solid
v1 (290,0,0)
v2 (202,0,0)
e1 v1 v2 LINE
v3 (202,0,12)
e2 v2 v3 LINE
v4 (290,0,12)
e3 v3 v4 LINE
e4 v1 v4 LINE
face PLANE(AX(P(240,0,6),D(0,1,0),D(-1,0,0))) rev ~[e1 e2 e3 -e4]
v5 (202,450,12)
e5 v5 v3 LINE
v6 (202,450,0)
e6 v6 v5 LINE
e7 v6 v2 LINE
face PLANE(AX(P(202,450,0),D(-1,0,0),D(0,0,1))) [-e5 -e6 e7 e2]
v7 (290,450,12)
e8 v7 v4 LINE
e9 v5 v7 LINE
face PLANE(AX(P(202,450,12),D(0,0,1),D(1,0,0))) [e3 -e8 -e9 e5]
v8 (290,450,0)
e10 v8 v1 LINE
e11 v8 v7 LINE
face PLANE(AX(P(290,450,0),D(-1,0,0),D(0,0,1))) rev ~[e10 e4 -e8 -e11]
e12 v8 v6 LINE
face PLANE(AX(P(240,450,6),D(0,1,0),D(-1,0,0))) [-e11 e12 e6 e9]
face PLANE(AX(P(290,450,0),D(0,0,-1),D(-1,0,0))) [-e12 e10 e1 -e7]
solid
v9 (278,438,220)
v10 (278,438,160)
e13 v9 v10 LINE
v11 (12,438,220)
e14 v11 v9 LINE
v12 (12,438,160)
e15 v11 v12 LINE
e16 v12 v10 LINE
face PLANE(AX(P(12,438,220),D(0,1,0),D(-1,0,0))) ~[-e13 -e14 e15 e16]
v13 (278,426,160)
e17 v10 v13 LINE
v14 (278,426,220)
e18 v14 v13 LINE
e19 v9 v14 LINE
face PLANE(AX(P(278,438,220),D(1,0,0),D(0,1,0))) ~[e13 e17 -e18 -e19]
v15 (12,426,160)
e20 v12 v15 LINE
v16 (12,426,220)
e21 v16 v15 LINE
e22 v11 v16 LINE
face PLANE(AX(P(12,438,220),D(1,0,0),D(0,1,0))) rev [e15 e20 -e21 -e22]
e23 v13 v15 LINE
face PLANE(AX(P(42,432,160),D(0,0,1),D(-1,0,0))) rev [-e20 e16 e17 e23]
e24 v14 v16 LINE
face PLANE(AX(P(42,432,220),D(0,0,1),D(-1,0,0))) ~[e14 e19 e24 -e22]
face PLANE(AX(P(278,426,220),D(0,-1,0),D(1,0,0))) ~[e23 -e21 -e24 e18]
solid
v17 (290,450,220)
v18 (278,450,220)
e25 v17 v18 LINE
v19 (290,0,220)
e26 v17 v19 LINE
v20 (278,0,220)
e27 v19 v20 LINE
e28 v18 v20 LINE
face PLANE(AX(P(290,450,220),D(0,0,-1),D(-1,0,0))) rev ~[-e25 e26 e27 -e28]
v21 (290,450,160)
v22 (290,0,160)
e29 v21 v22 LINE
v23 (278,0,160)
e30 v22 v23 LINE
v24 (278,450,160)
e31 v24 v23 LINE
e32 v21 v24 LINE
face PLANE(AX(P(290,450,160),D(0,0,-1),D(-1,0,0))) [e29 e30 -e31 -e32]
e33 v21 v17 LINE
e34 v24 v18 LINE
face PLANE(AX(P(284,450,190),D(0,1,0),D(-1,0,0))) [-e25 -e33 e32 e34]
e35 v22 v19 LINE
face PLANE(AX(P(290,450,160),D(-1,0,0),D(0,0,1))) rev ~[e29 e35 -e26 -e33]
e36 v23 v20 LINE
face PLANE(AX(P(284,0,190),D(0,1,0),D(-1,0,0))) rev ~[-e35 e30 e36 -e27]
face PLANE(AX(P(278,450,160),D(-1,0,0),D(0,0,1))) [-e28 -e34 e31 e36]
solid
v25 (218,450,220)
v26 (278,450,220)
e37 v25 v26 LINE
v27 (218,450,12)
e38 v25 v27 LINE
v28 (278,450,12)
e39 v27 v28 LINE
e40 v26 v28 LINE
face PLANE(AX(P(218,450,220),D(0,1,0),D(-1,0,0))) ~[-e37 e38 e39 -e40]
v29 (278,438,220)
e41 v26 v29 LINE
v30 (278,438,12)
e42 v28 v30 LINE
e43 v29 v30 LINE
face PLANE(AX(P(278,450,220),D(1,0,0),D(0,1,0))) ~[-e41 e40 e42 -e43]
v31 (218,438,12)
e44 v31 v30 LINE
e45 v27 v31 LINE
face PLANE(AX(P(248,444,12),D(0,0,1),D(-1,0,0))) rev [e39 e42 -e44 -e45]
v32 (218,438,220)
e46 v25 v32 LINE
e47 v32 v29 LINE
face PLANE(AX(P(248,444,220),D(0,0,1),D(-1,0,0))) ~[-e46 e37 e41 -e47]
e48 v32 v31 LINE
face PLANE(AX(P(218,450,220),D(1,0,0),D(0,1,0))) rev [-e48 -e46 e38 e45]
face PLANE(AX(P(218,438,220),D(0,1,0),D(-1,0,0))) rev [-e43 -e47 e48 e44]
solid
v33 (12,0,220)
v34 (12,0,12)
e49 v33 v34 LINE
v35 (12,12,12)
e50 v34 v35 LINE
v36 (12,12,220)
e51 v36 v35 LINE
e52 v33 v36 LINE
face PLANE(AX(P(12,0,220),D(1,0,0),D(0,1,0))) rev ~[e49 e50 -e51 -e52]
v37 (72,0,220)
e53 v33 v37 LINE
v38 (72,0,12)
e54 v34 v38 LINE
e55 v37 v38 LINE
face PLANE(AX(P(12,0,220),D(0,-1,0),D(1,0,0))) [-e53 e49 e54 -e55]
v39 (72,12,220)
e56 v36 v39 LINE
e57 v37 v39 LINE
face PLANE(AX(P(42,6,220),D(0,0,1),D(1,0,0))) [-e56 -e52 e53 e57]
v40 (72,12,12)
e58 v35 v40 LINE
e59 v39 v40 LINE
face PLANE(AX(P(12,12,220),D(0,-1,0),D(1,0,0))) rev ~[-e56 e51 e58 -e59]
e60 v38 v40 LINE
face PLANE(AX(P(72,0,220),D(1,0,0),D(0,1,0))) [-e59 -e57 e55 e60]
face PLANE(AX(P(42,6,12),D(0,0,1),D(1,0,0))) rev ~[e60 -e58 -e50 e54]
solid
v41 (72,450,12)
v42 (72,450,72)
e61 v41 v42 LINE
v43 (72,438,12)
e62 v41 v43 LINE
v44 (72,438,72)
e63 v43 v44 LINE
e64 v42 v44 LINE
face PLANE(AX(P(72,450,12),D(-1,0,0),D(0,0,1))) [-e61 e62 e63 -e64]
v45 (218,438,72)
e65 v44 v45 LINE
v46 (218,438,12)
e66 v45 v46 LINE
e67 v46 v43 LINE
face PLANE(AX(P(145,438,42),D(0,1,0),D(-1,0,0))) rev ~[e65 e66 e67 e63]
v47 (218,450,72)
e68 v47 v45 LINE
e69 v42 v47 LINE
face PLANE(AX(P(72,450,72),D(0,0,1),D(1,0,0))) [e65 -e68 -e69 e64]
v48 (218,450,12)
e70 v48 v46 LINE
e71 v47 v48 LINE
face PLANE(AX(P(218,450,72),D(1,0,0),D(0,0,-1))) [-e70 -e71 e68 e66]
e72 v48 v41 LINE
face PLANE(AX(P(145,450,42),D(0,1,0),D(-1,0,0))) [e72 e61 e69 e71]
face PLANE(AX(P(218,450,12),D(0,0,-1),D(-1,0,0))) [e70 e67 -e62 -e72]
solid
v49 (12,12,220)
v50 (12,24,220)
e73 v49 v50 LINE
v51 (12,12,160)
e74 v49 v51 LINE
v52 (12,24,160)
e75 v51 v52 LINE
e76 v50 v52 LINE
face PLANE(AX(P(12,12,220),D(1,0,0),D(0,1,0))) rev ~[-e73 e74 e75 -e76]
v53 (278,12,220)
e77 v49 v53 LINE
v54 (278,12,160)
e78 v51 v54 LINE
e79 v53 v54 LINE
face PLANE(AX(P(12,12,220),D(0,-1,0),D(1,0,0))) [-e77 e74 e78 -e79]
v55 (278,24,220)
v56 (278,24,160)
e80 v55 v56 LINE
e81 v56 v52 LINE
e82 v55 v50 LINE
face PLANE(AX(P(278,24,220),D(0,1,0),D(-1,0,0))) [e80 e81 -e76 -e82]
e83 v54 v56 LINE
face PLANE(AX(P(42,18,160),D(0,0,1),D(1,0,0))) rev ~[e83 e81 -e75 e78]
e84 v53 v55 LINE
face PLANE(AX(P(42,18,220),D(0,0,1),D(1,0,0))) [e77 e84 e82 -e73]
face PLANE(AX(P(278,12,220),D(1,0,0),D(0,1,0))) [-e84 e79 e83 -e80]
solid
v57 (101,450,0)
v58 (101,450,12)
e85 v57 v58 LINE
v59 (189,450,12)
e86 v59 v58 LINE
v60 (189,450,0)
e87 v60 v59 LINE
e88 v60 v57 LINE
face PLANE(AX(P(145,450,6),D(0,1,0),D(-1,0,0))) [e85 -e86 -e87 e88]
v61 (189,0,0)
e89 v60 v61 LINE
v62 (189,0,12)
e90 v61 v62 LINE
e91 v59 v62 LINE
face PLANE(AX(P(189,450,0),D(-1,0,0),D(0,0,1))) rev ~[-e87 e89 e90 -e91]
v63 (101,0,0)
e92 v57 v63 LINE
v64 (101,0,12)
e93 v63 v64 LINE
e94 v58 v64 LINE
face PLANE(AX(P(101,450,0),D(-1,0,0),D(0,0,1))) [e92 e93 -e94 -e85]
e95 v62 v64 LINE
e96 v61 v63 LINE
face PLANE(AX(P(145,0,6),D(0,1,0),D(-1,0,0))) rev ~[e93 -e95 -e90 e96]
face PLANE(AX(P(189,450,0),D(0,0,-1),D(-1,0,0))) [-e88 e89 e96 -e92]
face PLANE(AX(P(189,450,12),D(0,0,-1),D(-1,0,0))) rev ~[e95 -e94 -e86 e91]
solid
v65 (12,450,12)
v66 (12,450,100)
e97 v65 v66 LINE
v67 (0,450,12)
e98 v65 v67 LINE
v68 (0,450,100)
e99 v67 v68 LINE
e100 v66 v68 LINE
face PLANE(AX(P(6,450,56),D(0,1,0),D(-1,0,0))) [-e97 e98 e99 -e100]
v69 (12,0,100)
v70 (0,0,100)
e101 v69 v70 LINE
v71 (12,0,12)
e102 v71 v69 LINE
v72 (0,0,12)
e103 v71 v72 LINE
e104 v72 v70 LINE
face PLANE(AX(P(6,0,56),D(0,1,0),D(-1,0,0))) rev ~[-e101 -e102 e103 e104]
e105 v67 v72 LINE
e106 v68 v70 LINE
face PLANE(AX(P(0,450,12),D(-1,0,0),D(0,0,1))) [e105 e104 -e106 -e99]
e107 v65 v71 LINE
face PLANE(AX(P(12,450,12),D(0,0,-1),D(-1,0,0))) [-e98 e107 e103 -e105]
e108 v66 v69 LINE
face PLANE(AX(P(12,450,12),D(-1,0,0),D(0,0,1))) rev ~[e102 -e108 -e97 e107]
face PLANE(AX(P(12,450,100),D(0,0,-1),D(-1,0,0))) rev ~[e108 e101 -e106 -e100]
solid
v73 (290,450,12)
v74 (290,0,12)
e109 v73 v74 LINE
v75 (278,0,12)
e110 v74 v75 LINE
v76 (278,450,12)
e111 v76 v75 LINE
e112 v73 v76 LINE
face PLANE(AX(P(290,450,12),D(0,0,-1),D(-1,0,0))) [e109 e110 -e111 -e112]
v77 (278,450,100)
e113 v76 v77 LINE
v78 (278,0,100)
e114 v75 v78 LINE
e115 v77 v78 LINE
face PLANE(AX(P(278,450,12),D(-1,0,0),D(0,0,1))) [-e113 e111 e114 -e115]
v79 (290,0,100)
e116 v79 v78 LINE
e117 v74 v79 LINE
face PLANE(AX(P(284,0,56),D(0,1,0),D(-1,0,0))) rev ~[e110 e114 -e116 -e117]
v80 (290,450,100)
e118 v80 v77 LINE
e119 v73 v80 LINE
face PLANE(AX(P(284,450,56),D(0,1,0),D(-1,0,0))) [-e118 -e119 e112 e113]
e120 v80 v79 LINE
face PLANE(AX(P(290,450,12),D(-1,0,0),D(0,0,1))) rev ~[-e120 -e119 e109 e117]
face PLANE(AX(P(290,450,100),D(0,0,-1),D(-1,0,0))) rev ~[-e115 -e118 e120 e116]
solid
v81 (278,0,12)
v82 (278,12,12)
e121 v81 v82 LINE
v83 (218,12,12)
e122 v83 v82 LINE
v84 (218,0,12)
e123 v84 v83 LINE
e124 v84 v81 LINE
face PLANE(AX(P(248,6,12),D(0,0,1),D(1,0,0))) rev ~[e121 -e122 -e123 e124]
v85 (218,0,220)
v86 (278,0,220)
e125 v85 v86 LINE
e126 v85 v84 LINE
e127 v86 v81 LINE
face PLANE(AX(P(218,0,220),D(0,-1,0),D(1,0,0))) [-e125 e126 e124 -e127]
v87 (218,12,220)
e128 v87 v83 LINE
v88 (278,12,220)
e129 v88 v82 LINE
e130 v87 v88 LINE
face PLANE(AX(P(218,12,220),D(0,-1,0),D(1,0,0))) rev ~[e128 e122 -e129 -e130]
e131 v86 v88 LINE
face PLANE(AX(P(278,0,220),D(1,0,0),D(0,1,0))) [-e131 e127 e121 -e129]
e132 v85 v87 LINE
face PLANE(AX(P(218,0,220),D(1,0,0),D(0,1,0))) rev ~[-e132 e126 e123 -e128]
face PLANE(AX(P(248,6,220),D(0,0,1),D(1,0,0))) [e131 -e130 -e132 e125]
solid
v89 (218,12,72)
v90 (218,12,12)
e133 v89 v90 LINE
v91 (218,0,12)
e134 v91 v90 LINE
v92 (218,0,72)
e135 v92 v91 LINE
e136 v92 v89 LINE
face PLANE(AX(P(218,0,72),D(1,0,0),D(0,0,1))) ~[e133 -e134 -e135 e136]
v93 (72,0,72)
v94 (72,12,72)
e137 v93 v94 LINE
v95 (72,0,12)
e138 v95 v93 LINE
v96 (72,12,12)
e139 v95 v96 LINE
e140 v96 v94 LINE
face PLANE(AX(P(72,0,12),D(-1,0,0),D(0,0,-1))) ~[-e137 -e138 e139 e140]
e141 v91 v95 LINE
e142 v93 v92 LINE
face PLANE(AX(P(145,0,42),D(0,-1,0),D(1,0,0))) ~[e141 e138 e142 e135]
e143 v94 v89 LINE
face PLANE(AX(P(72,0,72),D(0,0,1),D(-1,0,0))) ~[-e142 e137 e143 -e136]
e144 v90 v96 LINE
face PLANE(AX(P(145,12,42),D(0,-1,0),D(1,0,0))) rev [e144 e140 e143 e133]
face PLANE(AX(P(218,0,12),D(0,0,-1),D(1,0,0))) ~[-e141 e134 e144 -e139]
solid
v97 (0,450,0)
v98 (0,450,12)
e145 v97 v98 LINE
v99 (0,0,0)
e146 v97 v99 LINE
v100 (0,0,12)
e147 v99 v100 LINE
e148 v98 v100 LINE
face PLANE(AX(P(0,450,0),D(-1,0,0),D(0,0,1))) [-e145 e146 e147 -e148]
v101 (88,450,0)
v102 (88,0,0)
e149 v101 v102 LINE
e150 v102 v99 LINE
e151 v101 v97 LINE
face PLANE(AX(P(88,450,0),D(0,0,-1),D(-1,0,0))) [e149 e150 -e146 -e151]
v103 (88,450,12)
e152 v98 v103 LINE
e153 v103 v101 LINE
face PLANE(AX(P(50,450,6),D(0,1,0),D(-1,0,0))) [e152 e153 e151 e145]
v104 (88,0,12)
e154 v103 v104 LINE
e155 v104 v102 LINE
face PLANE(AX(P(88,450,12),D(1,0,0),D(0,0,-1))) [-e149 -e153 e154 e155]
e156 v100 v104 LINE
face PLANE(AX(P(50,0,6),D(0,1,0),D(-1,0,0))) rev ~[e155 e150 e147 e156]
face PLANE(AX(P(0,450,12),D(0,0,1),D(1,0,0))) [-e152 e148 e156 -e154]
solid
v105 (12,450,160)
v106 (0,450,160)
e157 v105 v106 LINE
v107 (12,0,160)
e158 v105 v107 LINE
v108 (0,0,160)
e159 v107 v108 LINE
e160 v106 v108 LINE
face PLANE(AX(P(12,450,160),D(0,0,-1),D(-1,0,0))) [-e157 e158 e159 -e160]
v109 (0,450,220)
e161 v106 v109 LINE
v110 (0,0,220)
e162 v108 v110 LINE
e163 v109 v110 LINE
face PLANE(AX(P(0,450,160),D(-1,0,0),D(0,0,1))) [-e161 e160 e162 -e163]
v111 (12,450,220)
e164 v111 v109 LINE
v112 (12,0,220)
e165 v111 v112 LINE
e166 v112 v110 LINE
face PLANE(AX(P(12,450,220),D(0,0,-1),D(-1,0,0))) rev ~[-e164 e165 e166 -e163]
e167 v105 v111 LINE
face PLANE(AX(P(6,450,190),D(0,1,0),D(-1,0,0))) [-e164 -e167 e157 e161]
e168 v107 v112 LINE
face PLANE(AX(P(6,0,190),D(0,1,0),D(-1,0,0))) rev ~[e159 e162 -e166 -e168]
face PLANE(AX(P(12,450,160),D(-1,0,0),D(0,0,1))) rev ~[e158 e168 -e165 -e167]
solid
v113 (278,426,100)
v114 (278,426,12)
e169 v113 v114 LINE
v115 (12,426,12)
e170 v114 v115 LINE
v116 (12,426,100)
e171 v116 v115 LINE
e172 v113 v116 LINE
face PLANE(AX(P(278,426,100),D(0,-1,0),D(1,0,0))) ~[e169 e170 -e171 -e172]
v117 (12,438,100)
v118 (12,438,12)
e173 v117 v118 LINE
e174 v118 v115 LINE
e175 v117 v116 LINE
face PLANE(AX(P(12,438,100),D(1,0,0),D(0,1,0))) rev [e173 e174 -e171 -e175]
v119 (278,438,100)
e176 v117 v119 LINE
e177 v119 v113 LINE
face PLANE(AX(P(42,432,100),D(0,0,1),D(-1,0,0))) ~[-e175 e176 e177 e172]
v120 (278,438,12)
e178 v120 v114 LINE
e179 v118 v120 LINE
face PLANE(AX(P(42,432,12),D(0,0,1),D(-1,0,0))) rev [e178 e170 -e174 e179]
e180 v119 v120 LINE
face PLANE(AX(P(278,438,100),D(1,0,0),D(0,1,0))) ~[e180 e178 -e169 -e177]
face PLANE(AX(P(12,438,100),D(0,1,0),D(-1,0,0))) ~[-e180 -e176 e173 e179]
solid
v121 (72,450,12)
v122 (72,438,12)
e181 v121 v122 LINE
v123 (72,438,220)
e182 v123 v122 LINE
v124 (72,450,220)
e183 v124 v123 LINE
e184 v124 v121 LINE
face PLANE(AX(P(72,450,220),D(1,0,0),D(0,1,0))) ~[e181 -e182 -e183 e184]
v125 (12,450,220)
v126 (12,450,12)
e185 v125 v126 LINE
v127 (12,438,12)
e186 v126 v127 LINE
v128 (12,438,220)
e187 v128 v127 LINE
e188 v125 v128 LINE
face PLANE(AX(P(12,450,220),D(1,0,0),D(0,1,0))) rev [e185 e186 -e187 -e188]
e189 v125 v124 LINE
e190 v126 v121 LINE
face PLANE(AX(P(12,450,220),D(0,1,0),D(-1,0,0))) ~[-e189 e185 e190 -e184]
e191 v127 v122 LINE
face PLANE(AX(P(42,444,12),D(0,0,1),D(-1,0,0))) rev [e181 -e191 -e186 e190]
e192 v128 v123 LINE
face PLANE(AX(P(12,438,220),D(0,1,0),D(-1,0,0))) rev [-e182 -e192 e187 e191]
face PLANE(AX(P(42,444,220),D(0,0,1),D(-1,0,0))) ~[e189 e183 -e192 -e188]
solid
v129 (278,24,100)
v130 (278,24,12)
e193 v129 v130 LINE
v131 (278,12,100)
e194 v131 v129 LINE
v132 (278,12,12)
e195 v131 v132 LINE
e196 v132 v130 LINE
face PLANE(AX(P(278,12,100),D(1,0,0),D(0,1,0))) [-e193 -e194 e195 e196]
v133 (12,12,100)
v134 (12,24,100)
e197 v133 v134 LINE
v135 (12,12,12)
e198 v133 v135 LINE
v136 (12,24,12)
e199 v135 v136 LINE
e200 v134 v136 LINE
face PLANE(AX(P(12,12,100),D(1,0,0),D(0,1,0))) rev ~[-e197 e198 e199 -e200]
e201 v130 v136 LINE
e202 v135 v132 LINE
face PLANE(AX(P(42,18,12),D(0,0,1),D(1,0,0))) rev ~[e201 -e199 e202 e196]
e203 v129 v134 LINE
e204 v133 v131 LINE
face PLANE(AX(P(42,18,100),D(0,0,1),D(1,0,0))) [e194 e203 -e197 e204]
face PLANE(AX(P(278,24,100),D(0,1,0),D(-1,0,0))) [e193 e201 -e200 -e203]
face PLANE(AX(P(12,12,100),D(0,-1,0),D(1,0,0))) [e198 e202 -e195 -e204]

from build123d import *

# Parameters (mm, degrees)
F0_W      = 290
F0_H      = 225
F1_DEPTH  = 220
F2_W      = 12
F2_H      = 60
F3_DEPTH  = 450
F2_H_2    = 12
F2_W_2    = 88
F2_H_3    = 88
F4_DEPTH  = 450
F5_W      = 60
F5_H      = 12
F6_DEPTH  = 208
F5_W_2    = 73
F7_DEPTH  = 60
F8_START  = -120
F8_DEPTH  = 88
F9_DEPTH  = 12
F10_DEPTH = 25


with BuildPart() as f1:
    # F0 (on Top) → F1 (new body)
    with BuildSketch(Plane.XY):
        with Locations((145, 112.5)):
            Rectangle(F0_W, F0_H)
        with Locations((145, 337.5)):
            Rectangle(F0_W, F0_H)
    extrude(amount=F1_DEPTH)


with BuildPart() as f3:
    # F2 (on face) → F3 (new body, through all)
    with BuildSketch(Plane(origin=(0, 450, 0), x_dir=(-1, 0, 0), z_dir=(0, 1, 0))):
        with Locations((-284, 190)):
            Rectangle(F2_W, F2_H)
    extrude(amount=-F3_DEPTH)


with BuildPart() as f3b:
    # F2 (on face) → F3, piece 2 (new body, through all)
    with BuildSketch(Plane(origin=(0, 450, 0), x_dir=(-1, 0, 0), z_dir=(0, 1, 0))):
        Polygon((-278, 0), (-202, 0), (-202, 12), (-218, 12), (-278, 12), align=None)
        with Locations((-284, 6)):
            Rectangle(F2_W, F2_H_2)
    extrude(amount=-F3_DEPTH)


with BuildPart() as f3c:
    # F2 (on face) → F3, piece 3 (new body, through all)
    with BuildSketch(Plane(origin=(0, 450, 0), x_dir=(-1, 0, 0), z_dir=(0, 1, 0))):
        with Locations((-145, 6)):
            Rectangle(F2_W_2, F2_H_2)
    extrude(amount=-F3_DEPTH)


with BuildPart() as f3d:
    # F2 (on face) → F3, piece 4 (new body, through all)
    with BuildSketch(Plane(origin=(0, 450, 0), x_dir=(-1, 0, 0), z_dir=(0, 1, 0))):
        Polygon((-88, 0), (-12, 0), (-12, 12), (-72, 12), (-88, 12), align=None)
        with Locations((-6, 6)):
            Rectangle(F2_W, F2_H_2)
    extrude(amount=-F3_DEPTH)


with BuildPart() as f3e:
    # F2 (on face) → F3, piece 5 (new body, through all)
    with BuildSketch(Plane(origin=(0, 450, 0), x_dir=(-1, 0, 0), z_dir=(0, 1, 0))):
        with Locations((-6, 190)):
            Rectangle(F2_W, F2_H)
    extrude(amount=-F3_DEPTH)


with BuildPart() as f4:
    # F2 (on face) → F4 (new body, through all)
    with BuildSketch(Plane(origin=(0, 450, 0), x_dir=(-1, 0, 0), z_dir=(0, 1, 0))):
        with Locations((-284, 56)):
            Rectangle(F2_W, F2_H_3)
    extrude(amount=-F4_DEPTH)


with BuildPart() as f4b:
    # F2 (on face) → F4, piece 2 (new body, through all)
    with BuildSketch(Plane(origin=(0, 450, 0), x_dir=(-1, 0, 0), z_dir=(0, 1, 0))):
        with Locations((-6, 56)):
            Rectangle(F2_W, F2_H_3)
    extrude(amount=-F4_DEPTH)


with BuildPart() as f6:
    # F5 (on face) → F6 (new body, through all)
    with BuildSketch(Plane.XY.offset(220)):
        with Locations((42, 6)):
            Rectangle(F5_W, F5_H)
    extrude(amount=-F6_DEPTH)


with BuildPart() as f6b:
    # F5 (on face) → F6, piece 2 (new body, through all)
    with BuildSketch(Plane.XY.offset(220)):
        with Locations((248, 6)):
            Rectangle(F5_W, F5_H)
    extrude(amount=-F6_DEPTH)


with BuildPart() as f7:
    # F5 (on face) → F7 (new body)
    with BuildSketch(Plane.XY.offset(220)):
        with Locations((42, 18)):
            Rectangle(F5_W, F5_H)
        with Locations((108.5, 18)):
            Rectangle(F5_W_2, F5_H)
        with Locations((181.5, 18)):
            Rectangle(F5_W_2, F5_H)
        with Locations((248, 18)):
            Rectangle(F5_W, F5_H)
    extrude(amount=-F7_DEPTH)


with BuildPart() as f8:
    # F5 (on face) → F8 (new body)
    with BuildSketch(Plane.XY.offset(220).offset(F8_START)):
        with Locations((42, 18)):
            Rectangle(F5_W, F5_H)
        with Locations((108.5, 18)):
            Rectangle(F5_W_2, F5_H)
        with Locations((181.5, 18)):
            Rectangle(F5_W_2, F5_H)
        with Locations((248, 18)):
            Rectangle(F5_W, F5_H)
    extrude(amount=-F8_DEPTH)


with BuildPart() as f9:
    # F2 (on face) → F9 (new body)
    with BuildSketch(Plane(origin=(0, 450, 0), x_dir=(-1, 0, 0), z_dir=(0, 1, 0))):
        Polygon((-101, 12), (-88, 12), (-72, 12), (-72, 72), (-218, 72), (-218, 12), (-202, 12), (-189, 12), align=None)
    extrude(amount=-F9_DEPTH)


with BuildPart() as f10:
    # F0 (on Top) → F10 (new body)
    with BuildSketch(Plane.XY):
        with Locations((145, 112.5)):
            Rectangle(F0_W, F0_H)
    extrude(amount=F10_DEPTH)


with BuildPart() as f11_1:
    # F11: instance of F9
    add(f9.part.mirror(Plane(origin=(145, 225, 12.5), x_dir=(-1, 0, 0), z_dir=(0, 1, 0))))


with BuildPart() as f11_2:
    # F11: instance of F6b
    add(f6b.part.mirror(Plane(origin=(145, 225, 12.5), x_dir=(-1, 0, 0), z_dir=(0, 1, 0))))


with BuildPart() as f11_3:
    # F11: instance of F7
    add(f7.part.mirror(Plane(origin=(145, 225, 12.5), x_dir=(-1, 0, 0), z_dir=(0, 1, 0))))


with BuildPart() as f11_4:
    # F11: instance of F8
    add(f8.part.mirror(Plane(origin=(145, 225, 12.5), x_dir=(-1, 0, 0), z_dir=(0, 1, 0))))


with BuildPart() as f11_5:
    # F11: instance of F6
    add(f6.part.mirror(Plane(origin=(145, 225, 12.5), x_dir=(-1, 0, 0), z_dir=(0, 1, 0))))


solid = Compound([f3.part, f3b.part, f3c.part, f3d.part, f3e.part, f4.part, f4b.part, f6.part, f6b.part, f7.part, f8.part, f9.part, f11_1.part, f11_2.part, f11_3.part, f11_4.part, f11_5.part])
